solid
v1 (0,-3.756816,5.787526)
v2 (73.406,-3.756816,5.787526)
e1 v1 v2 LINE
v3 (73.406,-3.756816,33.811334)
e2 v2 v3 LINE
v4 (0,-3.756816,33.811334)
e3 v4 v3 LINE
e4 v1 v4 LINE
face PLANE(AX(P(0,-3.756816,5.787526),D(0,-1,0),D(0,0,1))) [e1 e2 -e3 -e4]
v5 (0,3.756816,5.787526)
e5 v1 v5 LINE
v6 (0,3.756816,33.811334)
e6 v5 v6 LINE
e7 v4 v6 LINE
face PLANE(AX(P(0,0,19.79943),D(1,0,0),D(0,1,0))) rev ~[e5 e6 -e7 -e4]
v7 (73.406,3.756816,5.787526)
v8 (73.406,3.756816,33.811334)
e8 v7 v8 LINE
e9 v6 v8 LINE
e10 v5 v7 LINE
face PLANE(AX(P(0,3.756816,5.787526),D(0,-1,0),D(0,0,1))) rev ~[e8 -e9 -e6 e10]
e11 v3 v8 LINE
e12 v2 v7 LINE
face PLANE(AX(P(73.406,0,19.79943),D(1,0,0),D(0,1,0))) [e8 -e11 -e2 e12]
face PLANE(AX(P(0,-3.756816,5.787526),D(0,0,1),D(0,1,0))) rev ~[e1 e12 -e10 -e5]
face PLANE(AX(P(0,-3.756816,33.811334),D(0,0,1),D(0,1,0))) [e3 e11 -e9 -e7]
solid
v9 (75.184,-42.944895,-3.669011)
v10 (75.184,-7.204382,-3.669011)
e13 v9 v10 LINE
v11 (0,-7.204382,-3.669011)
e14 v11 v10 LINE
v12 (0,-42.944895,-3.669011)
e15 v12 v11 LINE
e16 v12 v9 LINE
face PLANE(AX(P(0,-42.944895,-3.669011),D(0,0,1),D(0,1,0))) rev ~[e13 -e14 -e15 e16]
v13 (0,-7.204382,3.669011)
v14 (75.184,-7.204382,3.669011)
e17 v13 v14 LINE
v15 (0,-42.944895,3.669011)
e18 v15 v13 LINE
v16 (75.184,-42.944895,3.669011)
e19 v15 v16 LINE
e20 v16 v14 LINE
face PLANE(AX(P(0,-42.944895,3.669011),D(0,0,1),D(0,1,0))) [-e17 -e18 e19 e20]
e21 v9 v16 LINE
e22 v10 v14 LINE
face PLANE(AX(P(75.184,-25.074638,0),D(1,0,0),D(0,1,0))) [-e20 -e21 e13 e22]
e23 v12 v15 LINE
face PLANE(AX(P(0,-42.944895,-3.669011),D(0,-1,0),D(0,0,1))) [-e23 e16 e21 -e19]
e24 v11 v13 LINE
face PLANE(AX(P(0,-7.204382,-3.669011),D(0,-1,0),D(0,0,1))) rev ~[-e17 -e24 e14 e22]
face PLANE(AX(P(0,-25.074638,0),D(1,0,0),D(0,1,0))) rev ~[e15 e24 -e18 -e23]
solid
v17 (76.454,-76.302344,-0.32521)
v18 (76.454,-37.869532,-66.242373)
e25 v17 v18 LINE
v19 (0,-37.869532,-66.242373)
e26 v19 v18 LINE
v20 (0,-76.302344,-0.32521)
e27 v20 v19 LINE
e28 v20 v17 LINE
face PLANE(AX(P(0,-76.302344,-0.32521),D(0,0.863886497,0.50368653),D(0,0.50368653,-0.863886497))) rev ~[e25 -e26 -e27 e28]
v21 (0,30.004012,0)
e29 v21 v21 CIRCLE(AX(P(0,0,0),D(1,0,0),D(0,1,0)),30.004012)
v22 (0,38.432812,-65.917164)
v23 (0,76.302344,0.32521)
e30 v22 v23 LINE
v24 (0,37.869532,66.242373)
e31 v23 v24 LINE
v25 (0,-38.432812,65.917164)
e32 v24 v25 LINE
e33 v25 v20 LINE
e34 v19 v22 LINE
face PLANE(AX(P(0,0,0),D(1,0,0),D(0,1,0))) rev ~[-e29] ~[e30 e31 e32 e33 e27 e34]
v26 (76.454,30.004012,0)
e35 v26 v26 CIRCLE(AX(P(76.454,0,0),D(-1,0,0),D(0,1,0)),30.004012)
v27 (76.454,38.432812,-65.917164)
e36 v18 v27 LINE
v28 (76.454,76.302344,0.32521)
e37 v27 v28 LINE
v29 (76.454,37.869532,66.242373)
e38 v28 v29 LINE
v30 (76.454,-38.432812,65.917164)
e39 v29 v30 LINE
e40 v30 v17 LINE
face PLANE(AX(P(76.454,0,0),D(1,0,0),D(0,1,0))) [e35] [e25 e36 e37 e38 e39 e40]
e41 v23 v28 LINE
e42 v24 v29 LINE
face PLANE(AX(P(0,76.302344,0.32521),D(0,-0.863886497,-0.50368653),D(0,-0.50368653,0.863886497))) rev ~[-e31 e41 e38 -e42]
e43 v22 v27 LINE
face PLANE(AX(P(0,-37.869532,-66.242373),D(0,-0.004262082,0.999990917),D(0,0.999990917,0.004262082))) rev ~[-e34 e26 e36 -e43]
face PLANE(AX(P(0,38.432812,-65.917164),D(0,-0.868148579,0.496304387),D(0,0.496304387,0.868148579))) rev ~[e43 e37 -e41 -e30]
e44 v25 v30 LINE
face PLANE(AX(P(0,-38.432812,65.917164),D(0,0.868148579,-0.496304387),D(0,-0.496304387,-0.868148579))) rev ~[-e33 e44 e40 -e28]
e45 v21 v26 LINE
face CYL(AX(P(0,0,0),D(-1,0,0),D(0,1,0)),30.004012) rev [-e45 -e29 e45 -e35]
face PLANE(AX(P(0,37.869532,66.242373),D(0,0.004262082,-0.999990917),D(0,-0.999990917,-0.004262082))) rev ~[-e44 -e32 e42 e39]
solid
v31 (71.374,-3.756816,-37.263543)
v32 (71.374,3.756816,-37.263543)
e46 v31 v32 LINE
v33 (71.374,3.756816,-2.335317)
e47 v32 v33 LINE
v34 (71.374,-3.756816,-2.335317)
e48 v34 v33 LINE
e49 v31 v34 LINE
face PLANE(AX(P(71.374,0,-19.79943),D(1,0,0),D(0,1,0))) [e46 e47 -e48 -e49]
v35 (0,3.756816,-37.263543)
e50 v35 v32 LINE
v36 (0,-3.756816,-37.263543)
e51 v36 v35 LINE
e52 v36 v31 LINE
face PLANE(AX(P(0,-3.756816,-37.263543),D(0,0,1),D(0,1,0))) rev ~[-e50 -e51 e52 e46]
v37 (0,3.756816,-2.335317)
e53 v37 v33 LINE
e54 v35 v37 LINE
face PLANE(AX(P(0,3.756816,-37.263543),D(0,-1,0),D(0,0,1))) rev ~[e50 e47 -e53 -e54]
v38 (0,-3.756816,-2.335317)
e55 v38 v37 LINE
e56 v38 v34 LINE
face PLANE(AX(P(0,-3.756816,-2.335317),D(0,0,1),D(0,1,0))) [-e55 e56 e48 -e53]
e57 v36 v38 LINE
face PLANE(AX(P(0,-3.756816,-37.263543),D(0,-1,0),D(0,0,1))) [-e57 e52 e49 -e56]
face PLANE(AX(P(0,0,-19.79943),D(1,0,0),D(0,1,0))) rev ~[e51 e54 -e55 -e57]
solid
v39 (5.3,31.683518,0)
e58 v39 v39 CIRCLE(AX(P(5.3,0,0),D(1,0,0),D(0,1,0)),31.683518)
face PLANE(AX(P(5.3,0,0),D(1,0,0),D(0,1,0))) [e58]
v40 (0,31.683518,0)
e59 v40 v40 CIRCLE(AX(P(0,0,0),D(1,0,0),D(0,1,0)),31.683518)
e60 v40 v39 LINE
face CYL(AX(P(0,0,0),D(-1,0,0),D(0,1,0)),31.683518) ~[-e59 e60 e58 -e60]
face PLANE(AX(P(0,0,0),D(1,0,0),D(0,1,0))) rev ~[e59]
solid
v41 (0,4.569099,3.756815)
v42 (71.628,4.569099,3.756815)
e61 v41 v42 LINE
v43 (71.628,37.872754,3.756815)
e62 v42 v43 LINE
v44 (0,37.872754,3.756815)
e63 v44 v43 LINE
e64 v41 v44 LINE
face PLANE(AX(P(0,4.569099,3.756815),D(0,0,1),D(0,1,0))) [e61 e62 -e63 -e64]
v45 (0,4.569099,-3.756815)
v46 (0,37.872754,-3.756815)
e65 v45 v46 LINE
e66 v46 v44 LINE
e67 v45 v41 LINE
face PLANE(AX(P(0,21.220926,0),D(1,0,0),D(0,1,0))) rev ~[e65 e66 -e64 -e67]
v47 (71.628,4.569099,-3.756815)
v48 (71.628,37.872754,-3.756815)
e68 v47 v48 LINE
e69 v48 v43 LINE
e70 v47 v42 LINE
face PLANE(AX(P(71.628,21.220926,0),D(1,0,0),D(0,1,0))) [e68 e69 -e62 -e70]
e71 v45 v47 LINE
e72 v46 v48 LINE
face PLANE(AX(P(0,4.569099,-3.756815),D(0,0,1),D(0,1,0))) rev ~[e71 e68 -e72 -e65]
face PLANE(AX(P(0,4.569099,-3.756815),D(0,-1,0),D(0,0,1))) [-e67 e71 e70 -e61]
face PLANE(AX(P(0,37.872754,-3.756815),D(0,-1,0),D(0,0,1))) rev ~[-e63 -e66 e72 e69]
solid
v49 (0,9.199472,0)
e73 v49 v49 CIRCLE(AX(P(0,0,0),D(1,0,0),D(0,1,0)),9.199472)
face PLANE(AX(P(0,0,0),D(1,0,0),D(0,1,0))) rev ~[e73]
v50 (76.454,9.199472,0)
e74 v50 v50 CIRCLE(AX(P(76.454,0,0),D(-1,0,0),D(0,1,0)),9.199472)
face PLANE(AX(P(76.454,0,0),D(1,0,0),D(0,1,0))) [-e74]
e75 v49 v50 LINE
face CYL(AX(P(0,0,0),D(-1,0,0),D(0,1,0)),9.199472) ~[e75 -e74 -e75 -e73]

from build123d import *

# Parameters (mm, degrees)
F1_DEPTH  = 76.454
F2_R      = 30.0040123815
F2_R_2    = 9.199471782
F3_DEPTH  = 91.694
F4_W      = 35.7405124232
F4_H      = 7.3380223475
F5_DEPTH  = 75.184
F6_W      = 7.5136311352
F6_H      = 28.0238082632
F7_DEPTH  = 73.406
F8_W      = 7.5136311352
F8_H      = 34.9282254465
F9_DEPTH  = 71.374
F10_W     = 33.3036547527
F10_H     = 7.5136297382
F11_DEPTH = 71.628
F14_R     = 31.6835181621
F15_DEPTH = 5.3


# Not quite as in the source:
# - the program builds the solid bodies; features that only make, move or delete a surface that nothing else refers to are left out


with BuildPart() as f1:
    # F0 (on Right) → F1 (new body)
    with BuildSketch(Plane.YZ):
        Polygon((38.4328120877, -65.9171635344), (76.30234421, 0.3252098396), (37.8695321224, 66.242373374), (-38.4328120877, 65.9171635344), (-76.30234421, -0.3252098396), (-37.8695321224, -66.242373374), align=None)
    extrude(amount=F1_DEPTH)

    # F2 (on Right) → F3 (cut)
    with BuildSketch(Plane.YZ):
        Circle(F2_R)
        Circle(F2_R_2, mode=Mode.SUBTRACT)
    extrude(amount=F3_DEPTH, mode=Mode.SUBTRACT)


with BuildPart() as f5:
    # F4 (on Right) → F5 (new body)
    with BuildSketch(Plane.YZ):
        with Locations((-25.0746384263, 0)):
            Rectangle(F4_W, F4_H)
    extrude(amount=F5_DEPTH)


with BuildPart() as f7:
    # F6 (on Right) → F7 (new body)
    with BuildSketch(Plane.YZ):
        with Locations((0, 19.7994299233)):
            Rectangle(F6_W, F6_H)
    extrude(amount=F7_DEPTH)


with BuildPart() as f9:
    # F8 (on Right) → F9 (new body)
    with BuildSketch(Plane.YZ):
        with Locations((0, -19.7994299233)):
            Rectangle(F8_W, F8_H)
    extrude(amount=F9_DEPTH)


with BuildPart() as f11:
    # F10 (on Right) → F11 (new body)
    with BuildSketch(Plane.YZ):
        with Locations((21.2209261954, 0)):
            Rectangle(F10_W, F10_H)
    extrude(amount=F11_DEPTH)


with BuildPart() as f15:
    # F14 (on Right) → F15 (new body)
    with BuildSketch(Plane.YZ):
        Circle(F14_R)
    extrude(amount=F15_DEPTH)


solid = Compound([f1.part, f5.part, f7.part, f9.part, f11.part, f15.part])
